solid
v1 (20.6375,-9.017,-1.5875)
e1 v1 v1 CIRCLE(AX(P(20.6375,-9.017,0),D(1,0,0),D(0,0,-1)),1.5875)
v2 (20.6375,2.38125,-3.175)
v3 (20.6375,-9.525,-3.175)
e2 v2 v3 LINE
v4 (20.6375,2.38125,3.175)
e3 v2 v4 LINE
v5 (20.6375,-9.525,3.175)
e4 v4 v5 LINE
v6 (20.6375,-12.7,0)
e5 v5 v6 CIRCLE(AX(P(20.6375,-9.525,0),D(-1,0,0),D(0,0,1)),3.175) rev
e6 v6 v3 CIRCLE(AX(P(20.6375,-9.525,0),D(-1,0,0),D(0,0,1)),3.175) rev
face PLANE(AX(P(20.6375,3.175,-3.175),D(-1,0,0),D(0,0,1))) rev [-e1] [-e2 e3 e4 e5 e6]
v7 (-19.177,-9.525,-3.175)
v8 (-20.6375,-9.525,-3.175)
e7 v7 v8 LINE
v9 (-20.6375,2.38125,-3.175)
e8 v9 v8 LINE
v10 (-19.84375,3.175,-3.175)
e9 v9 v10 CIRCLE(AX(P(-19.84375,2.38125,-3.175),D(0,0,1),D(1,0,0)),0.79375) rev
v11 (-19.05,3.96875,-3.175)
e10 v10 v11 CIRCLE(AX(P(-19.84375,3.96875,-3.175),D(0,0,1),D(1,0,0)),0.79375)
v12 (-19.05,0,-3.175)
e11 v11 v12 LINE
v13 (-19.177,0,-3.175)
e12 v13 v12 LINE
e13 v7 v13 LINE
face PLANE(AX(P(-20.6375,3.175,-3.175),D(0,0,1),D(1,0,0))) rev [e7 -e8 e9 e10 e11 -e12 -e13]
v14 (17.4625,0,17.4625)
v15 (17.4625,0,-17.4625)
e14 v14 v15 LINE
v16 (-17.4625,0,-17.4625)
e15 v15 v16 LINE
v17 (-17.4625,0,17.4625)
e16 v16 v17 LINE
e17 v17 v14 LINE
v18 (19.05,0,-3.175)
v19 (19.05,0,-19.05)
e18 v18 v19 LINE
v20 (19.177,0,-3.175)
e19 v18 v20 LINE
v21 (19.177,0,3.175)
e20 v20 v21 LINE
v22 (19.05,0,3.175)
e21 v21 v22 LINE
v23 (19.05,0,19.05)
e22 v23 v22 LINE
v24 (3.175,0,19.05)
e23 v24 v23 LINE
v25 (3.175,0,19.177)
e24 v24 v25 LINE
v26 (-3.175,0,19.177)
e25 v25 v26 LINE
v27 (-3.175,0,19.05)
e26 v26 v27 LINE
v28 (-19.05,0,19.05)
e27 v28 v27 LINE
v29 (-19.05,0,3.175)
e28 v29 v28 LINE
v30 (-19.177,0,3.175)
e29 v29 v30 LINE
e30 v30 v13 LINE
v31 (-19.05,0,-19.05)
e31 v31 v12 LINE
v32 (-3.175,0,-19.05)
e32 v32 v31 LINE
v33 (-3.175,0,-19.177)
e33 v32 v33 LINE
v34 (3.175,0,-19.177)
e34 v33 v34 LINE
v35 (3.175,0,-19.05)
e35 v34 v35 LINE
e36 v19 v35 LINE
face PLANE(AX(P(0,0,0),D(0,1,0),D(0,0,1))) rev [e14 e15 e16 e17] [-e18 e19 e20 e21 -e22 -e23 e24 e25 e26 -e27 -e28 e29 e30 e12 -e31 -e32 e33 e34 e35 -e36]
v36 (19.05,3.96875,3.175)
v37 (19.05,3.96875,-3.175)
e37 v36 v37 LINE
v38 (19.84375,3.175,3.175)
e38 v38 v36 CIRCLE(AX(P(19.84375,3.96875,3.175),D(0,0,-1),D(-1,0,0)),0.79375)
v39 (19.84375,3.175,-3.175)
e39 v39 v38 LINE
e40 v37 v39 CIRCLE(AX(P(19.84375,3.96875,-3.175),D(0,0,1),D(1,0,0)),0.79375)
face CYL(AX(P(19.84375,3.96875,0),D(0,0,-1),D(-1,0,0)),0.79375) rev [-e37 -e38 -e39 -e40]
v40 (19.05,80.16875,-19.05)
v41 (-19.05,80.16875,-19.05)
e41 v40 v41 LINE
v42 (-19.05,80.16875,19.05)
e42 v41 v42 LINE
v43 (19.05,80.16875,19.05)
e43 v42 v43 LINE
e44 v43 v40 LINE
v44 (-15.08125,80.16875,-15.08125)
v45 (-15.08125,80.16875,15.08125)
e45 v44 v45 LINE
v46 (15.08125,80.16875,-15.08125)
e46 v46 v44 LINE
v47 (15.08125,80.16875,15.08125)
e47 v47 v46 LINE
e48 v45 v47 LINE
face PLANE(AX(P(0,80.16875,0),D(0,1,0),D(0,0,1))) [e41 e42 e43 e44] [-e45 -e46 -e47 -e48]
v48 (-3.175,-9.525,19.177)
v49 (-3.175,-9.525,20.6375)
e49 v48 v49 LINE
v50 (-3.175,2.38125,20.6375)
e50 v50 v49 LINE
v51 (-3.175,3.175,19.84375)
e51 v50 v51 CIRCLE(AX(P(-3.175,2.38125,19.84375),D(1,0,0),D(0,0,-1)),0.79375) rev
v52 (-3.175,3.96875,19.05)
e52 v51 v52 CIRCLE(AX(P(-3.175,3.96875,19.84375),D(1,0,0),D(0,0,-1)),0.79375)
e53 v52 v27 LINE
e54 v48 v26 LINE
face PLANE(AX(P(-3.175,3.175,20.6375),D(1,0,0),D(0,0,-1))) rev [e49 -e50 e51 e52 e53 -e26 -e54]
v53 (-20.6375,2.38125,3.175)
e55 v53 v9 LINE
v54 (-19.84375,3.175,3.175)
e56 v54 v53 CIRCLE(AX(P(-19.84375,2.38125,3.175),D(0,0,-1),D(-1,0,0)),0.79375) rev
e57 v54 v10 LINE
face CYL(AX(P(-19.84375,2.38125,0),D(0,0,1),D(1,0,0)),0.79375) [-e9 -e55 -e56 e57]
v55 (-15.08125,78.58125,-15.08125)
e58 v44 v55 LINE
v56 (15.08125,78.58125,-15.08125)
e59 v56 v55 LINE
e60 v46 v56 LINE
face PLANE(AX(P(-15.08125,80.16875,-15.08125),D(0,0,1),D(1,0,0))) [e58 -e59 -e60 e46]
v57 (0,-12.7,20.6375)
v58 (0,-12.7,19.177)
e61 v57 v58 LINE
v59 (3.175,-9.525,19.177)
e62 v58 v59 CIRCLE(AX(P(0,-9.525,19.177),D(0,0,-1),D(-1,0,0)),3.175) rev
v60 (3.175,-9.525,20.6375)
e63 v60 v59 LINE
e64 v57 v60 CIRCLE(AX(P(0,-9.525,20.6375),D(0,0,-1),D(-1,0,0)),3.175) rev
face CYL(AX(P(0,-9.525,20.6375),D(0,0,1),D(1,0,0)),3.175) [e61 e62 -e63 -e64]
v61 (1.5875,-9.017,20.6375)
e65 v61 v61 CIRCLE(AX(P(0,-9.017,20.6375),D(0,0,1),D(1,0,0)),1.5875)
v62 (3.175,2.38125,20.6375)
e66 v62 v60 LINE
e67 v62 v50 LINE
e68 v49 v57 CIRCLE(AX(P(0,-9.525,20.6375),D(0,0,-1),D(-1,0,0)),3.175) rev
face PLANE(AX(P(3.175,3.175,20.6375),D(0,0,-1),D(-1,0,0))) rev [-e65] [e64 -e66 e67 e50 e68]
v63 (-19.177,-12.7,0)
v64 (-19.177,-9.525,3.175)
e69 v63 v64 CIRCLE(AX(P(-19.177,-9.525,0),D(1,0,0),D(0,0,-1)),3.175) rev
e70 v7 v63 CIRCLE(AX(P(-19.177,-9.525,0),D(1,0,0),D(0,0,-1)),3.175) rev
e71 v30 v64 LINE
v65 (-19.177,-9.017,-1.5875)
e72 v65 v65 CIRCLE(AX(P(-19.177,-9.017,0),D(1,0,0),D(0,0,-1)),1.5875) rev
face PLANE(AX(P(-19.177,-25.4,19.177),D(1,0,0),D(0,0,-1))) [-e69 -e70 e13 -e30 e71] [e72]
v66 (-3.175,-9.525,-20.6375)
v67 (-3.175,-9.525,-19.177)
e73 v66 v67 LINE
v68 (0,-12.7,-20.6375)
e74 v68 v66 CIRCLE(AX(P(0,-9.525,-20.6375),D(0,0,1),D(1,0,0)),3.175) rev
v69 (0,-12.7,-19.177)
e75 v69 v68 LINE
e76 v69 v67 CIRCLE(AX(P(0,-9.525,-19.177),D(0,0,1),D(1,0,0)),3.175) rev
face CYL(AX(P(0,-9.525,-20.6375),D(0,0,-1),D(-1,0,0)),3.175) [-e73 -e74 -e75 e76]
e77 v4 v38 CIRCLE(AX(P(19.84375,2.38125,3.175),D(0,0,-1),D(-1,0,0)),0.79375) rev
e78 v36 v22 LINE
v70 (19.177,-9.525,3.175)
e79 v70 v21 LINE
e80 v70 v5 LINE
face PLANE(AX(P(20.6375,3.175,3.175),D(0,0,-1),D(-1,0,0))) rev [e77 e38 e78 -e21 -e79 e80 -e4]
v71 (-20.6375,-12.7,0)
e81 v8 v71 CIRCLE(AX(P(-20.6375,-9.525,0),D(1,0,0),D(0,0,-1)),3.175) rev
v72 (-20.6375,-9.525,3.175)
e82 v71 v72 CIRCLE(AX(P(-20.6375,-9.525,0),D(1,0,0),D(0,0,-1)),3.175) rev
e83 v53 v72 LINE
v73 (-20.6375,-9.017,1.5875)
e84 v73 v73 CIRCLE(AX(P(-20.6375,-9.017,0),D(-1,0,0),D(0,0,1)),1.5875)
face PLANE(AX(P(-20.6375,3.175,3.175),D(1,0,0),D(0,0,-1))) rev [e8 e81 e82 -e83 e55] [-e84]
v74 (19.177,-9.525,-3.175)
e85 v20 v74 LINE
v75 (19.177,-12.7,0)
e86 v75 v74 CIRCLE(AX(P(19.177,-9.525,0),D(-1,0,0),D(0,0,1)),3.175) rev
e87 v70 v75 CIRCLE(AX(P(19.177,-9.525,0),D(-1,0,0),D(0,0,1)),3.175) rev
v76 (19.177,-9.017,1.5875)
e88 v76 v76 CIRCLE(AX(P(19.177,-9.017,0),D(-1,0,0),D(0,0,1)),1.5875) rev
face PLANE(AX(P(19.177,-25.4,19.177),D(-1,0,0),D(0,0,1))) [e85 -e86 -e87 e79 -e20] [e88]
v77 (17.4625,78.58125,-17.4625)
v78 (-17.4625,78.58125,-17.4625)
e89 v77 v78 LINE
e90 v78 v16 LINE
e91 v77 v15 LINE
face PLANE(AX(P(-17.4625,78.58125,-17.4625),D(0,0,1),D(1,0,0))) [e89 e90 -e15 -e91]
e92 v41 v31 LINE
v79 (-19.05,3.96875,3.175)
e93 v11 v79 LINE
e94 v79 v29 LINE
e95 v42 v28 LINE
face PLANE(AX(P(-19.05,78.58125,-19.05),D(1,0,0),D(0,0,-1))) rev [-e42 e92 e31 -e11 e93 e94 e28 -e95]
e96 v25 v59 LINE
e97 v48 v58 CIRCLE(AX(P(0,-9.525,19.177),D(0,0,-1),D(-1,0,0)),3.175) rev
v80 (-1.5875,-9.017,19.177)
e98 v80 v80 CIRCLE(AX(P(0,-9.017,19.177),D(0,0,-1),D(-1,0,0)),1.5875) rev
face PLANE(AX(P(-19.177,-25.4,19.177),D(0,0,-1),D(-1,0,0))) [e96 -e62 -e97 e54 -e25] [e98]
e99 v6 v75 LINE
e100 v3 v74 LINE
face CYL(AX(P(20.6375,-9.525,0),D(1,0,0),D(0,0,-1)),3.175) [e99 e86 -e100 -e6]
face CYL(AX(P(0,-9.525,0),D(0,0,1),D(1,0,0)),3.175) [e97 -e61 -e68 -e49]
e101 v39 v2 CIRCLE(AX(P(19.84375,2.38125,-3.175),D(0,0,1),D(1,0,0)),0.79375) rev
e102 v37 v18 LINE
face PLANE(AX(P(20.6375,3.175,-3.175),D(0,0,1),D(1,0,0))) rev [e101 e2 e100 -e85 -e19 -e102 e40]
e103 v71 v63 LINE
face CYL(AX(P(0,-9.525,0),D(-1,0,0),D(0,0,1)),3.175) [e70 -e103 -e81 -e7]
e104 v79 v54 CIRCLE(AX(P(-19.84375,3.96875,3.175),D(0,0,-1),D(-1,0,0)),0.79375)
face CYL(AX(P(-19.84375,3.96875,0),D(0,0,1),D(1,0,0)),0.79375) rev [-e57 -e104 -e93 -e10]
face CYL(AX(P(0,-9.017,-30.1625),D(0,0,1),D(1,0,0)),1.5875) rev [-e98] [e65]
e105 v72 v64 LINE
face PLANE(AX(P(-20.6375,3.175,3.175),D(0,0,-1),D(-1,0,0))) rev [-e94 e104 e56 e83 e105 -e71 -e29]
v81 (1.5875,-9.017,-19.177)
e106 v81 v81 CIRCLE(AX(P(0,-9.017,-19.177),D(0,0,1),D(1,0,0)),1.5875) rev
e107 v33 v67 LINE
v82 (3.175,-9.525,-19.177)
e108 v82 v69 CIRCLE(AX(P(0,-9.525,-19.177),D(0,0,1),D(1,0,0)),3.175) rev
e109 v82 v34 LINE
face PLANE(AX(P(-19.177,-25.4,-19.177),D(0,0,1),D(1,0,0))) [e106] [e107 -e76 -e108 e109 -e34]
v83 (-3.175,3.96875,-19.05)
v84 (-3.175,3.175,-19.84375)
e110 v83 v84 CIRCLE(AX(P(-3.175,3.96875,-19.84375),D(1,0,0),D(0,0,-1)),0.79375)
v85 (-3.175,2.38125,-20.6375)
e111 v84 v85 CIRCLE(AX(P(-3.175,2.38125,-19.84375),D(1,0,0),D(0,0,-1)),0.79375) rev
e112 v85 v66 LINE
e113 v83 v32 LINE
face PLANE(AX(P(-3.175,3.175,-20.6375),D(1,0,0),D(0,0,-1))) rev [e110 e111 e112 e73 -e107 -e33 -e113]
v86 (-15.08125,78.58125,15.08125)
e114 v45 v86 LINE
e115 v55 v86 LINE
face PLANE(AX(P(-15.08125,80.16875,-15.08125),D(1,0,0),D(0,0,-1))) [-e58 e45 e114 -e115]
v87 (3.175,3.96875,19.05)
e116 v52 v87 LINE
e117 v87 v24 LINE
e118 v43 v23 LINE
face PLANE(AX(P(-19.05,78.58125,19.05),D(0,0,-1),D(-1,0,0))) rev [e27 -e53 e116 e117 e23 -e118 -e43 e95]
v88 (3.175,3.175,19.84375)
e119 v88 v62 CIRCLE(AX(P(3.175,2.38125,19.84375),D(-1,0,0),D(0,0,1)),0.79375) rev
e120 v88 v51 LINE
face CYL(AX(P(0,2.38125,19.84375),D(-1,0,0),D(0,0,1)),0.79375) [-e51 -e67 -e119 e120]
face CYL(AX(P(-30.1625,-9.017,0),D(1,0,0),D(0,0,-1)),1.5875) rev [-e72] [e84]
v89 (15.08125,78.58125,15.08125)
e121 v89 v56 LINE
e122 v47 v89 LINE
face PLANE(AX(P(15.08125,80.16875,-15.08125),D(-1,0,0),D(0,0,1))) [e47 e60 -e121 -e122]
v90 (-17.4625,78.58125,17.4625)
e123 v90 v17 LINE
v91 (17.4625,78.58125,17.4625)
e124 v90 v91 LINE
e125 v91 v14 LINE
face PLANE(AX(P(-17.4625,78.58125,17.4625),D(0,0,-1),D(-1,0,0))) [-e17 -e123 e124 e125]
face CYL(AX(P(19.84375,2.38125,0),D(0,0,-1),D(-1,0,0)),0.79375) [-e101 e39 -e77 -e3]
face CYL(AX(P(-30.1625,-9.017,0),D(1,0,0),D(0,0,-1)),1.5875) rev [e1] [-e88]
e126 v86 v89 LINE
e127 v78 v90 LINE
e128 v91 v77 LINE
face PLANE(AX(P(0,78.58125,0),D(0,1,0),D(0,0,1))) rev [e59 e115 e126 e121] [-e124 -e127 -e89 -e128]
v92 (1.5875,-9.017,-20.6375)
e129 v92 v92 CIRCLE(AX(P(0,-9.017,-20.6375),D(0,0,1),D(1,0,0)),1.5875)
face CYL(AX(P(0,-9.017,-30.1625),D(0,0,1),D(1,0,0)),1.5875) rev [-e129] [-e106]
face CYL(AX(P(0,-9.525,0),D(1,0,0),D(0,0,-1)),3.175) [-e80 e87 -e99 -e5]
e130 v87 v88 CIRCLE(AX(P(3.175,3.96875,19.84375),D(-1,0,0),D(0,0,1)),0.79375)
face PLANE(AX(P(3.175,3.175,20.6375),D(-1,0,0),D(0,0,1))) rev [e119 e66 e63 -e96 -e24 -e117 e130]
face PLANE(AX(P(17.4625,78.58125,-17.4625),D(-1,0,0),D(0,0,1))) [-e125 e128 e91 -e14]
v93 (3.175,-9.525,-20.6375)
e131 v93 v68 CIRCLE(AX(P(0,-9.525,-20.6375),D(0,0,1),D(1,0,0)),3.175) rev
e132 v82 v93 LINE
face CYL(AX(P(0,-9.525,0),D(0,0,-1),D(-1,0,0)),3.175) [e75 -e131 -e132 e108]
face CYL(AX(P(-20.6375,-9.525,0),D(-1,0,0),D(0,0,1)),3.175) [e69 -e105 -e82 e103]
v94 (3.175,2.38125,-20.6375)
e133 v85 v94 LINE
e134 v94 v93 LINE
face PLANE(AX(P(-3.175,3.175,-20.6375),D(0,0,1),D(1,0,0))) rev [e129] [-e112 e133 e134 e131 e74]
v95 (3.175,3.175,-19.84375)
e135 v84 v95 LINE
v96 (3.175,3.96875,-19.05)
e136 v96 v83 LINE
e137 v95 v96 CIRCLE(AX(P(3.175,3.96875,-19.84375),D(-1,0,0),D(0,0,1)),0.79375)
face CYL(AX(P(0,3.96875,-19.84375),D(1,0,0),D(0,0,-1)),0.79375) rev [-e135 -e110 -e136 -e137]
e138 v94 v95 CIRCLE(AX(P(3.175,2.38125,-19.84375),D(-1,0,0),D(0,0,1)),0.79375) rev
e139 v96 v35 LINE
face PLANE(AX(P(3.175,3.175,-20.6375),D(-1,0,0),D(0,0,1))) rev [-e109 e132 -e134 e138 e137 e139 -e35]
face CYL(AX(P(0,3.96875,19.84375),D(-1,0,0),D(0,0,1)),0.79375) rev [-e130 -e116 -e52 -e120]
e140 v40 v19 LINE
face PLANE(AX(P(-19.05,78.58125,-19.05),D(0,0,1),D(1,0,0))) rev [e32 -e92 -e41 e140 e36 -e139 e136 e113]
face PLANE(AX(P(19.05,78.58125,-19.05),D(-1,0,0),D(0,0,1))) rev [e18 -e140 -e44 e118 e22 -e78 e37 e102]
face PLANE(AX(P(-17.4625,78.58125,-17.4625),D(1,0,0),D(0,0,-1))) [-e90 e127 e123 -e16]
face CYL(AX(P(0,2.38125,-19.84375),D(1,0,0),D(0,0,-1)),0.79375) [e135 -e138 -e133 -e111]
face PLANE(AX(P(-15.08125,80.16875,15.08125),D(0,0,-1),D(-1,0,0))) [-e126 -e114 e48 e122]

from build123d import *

# Parameters (mm, degrees)
SKETCH1_W             = 38.1
SKETCH1_H             = 38.1
SKETCH1_W_2           = 34.925
SKETCH1_H_2           = 34.925
BOSS_EXTRUDE1_DEPTH   = 78.58125
SKETCH2_W             = 38.1
SKETCH2_H             = 38.1
SKETCH2_W_2           = 30.1625
SKETCH2_H_2           = 30.1625
BOSS_EXTRUDE2_DEPTH   = 1.5875
SKETCH3_W             = 1.5875
SKETCH3_H             = 6.35
BOSS_EXTRUDE3_DEPTH   = 12.7
SKETCH3_W_2           = 6.35
SKETCH3_H_2           = 1.5875
BOSS_EXTRUDE3_2_DEPTH = 12.7
BOSS_EXTRUDE3_3_DEPTH = 12.7
BOSS_EXTRUDE3_4_DEPTH = 12.7
SKETCH4_R             = 1.5875
CUT_EXTRUDE3_DEPTH    = 50.8
SKETCH5_R             = 1.5875
CUT_EXTRUDE4_DEPTH    = 50.8
SKETCH6_W             = 6.35
SKETCH6_H             = 1.5875
SKETCH6_W_2           = 1.5875
SKETCH6_H_2           = 6.35
BOSS_EXTRUDE4_DEPTH   = 3.175
FILLET3_R             = 0.79375
FILLET4_R             = 3.175
SKETCH7_W             = 38.354
SKETCH7_H             = 38.354
CUT_EXTRUDE5_DEPTH    = 25.4


with BuildPart() as part:
    # Sketch1 → Boss-Extrude1 (new body)
    with BuildSketch(Plane(origin=(0, 0, 0), x_dir=(1, 0, 0), z_dir=(0, 1, 0))):
        Rectangle(SKETCH1_W, SKETCH1_H)
        Rectangle(SKETCH1_W_2, SKETCH1_H_2, mode=Mode.SUBTRACT)
    extrude(amount=BOSS_EXTRUDE1_DEPTH)

    # Sketch2 → Boss-Extrude2 (add)
    with BuildSketch(Plane(origin=(0, 78.58125, 0), x_dir=(1, 0, 0), z_dir=(0, 1, 0))):
        Rectangle(SKETCH2_W, SKETCH2_H)
        Rectangle(SKETCH2_W_2, SKETCH2_H_2, mode=Mode.SUBTRACT)
    extrude(amount=BOSS_EXTRUDE2_DEPTH)



with BuildPart() as body_2:
    # Sketch3 → Boss-Extrude3 (new body)
    with BuildSketch(Plane.XZ):
        with Locations((-19.84375, 0)):
            Rectangle(SKETCH3_W, SKETCH3_H)
    extrude(amount=BOSS_EXTRUDE3_DEPTH)


with BuildPart() as body_3:
    # Sketch3 → Boss-Extrude3 2 (new body)
    with BuildSketch(Plane.XZ):
        with Locations((0, 19.84375)):
            Rectangle(SKETCH3_W_2, SKETCH3_H_2)
    extrude(amount=BOSS_EXTRUDE3_2_DEPTH)


with BuildPart() as body_4:
    # Sketch3 → Boss-Extrude3 3 (new body)
    with BuildSketch(Plane.XZ):
        with Locations((19.84375, 0)):
            Rectangle(SKETCH3_W, SKETCH3_H)
    extrude(amount=BOSS_EXTRUDE3_3_DEPTH)


with BuildPart() as body_5:
    # Sketch3 → Boss-Extrude3 4 (new body)
    with BuildSketch(Plane.XZ):
        with Locations((0, -19.84375)):
            Rectangle(SKETCH3_W_2, SKETCH3_H_2)
    extrude(amount=BOSS_EXTRUDE3_4_DEPTH)


with BuildPart() as cut_extrude3_tool:
    # Sketch4 → Cut-Extrude3 (new body)
    with BuildSketch(Plane.XY.offset(20.6375)):
        with Locations((0, -9.017)):
            Circle(SKETCH4_R)
    extrude(amount=-CUT_EXTRUDE3_DEPTH)


with BuildPart() as body_3_1:
    add(body_3.part)

    # Cut-Extrude3: cut by cut_extrude3_tool
    add(cut_extrude3_tool.part, mode=Mode.SUBTRACT)


with BuildPart() as body_5_1:
    add(body_5.part)

    # Cut-Extrude3: cut by cut_extrude3_tool
    add(cut_extrude3_tool.part, mode=Mode.SUBTRACT)


with BuildPart() as cut_extrude4_tool:
    # Sketch5 → Cut-Extrude4 (new body)
    with BuildSketch(Plane(origin=(20.6375, 0, 0), x_dir=(0, 0, -1), z_dir=(1, 0, 0))):
        with Locations((0, -9.017)):
            Circle(SKETCH5_R)
    extrude(amount=-CUT_EXTRUDE4_DEPTH)


with BuildPart() as body_2_1:
    add(body_2.part)

    # Cut-Extrude4: cut by cut_extrude4_tool
    add(cut_extrude4_tool.part, mode=Mode.SUBTRACT)


with BuildPart() as body_4_1:
    add(body_4.part)

    # Cut-Extrude4: cut by cut_extrude4_tool
    add(cut_extrude4_tool.part, mode=Mode.SUBTRACT)


with BuildPart() as part_1:
    add(part.part)

    add(body_2_1.part)  # Boss-Extrude4 merges body 2

    add(body_3_1.part)  # Boss-Extrude4 merges body 3

    add(body_4_1.part)  # Boss-Extrude4 merges body 4

    add(body_5_1.part)  # Boss-Extrude4 merges body 5
    # Sketch6 → Boss-Extrude4 (add)
    with BuildSketch(Plane(origin=(0, 0, 0), x_dir=(1, 0, 0), z_dir=(0, 1, 0))):
        with Locations((0, 19.84375)):
            Rectangle(SKETCH6_W, SKETCH6_H)
        with Locations((19.84375, 0)):
            Rectangle(SKETCH6_W_2, SKETCH6_H_2)
        with Locations((0, -19.84375)):
            Rectangle(SKETCH6_W, SKETCH6_H)
        with Locations((-19.84375, 0)):
            Rectangle(SKETCH6_W_2, SKETCH6_H_2)
    extrude(amount=BOSS_EXTRUDE4_DEPTH)

    # Fillet3
    fillet3_edges = [part_1.edges().sort_by_distance(p)[0] for p in [
        (-19.05, 3.175, 0),
        (0, 3.175, -19.05),
        (19.05, 3.175, 0),
        (0, 3.175, 19.05),
    ]]
    fillet(fillet3_edges, radius=FILLET3_R)
    fillet3_2_edges = [part_1.edges().sort_by_distance(p)[0] for p in [
        (-20.6375, 3.175, 0),
        (0, 3.175, -20.6375),
        (20.6375, 3.175, 0),
        (0, 3.175, 20.6375),
    ]]
    fillet(fillet3_2_edges, radius=FILLET3_R - 0.0001)  # a hair under: the kernel refuses the full size

    # Fillet4
    fillet4_edges = [part_1.edges().sort_by_distance(p)[0] for p in [
        (3.175, -12.7, -19.84375),
        (-3.175, -12.7, -19.84375),
        (19.84375, -12.7, -3.175),
        (19.84375, -12.7, 3.175),
        (3.175, -12.7, 19.84375),
        (-3.175, -12.7, 19.84375),
        (-19.84375, -12.7, 3.175),
        (-19.84375, -12.7, -3.175),
    ]]
    fillet(fillet4_edges, radius=FILLET4_R - 0.0001)  # a hair under: the kernel refuses the full size

    # Sketch7 → Cut-Extrude5 (cut)
    with BuildSketch(Plane.XZ):
        Rectangle(SKETCH7_W, SKETCH7_H)
    extrude(amount=CUT_EXTRUDE5_DEPTH, mode=Mode.SUBTRACT)


solid = part_1.part
